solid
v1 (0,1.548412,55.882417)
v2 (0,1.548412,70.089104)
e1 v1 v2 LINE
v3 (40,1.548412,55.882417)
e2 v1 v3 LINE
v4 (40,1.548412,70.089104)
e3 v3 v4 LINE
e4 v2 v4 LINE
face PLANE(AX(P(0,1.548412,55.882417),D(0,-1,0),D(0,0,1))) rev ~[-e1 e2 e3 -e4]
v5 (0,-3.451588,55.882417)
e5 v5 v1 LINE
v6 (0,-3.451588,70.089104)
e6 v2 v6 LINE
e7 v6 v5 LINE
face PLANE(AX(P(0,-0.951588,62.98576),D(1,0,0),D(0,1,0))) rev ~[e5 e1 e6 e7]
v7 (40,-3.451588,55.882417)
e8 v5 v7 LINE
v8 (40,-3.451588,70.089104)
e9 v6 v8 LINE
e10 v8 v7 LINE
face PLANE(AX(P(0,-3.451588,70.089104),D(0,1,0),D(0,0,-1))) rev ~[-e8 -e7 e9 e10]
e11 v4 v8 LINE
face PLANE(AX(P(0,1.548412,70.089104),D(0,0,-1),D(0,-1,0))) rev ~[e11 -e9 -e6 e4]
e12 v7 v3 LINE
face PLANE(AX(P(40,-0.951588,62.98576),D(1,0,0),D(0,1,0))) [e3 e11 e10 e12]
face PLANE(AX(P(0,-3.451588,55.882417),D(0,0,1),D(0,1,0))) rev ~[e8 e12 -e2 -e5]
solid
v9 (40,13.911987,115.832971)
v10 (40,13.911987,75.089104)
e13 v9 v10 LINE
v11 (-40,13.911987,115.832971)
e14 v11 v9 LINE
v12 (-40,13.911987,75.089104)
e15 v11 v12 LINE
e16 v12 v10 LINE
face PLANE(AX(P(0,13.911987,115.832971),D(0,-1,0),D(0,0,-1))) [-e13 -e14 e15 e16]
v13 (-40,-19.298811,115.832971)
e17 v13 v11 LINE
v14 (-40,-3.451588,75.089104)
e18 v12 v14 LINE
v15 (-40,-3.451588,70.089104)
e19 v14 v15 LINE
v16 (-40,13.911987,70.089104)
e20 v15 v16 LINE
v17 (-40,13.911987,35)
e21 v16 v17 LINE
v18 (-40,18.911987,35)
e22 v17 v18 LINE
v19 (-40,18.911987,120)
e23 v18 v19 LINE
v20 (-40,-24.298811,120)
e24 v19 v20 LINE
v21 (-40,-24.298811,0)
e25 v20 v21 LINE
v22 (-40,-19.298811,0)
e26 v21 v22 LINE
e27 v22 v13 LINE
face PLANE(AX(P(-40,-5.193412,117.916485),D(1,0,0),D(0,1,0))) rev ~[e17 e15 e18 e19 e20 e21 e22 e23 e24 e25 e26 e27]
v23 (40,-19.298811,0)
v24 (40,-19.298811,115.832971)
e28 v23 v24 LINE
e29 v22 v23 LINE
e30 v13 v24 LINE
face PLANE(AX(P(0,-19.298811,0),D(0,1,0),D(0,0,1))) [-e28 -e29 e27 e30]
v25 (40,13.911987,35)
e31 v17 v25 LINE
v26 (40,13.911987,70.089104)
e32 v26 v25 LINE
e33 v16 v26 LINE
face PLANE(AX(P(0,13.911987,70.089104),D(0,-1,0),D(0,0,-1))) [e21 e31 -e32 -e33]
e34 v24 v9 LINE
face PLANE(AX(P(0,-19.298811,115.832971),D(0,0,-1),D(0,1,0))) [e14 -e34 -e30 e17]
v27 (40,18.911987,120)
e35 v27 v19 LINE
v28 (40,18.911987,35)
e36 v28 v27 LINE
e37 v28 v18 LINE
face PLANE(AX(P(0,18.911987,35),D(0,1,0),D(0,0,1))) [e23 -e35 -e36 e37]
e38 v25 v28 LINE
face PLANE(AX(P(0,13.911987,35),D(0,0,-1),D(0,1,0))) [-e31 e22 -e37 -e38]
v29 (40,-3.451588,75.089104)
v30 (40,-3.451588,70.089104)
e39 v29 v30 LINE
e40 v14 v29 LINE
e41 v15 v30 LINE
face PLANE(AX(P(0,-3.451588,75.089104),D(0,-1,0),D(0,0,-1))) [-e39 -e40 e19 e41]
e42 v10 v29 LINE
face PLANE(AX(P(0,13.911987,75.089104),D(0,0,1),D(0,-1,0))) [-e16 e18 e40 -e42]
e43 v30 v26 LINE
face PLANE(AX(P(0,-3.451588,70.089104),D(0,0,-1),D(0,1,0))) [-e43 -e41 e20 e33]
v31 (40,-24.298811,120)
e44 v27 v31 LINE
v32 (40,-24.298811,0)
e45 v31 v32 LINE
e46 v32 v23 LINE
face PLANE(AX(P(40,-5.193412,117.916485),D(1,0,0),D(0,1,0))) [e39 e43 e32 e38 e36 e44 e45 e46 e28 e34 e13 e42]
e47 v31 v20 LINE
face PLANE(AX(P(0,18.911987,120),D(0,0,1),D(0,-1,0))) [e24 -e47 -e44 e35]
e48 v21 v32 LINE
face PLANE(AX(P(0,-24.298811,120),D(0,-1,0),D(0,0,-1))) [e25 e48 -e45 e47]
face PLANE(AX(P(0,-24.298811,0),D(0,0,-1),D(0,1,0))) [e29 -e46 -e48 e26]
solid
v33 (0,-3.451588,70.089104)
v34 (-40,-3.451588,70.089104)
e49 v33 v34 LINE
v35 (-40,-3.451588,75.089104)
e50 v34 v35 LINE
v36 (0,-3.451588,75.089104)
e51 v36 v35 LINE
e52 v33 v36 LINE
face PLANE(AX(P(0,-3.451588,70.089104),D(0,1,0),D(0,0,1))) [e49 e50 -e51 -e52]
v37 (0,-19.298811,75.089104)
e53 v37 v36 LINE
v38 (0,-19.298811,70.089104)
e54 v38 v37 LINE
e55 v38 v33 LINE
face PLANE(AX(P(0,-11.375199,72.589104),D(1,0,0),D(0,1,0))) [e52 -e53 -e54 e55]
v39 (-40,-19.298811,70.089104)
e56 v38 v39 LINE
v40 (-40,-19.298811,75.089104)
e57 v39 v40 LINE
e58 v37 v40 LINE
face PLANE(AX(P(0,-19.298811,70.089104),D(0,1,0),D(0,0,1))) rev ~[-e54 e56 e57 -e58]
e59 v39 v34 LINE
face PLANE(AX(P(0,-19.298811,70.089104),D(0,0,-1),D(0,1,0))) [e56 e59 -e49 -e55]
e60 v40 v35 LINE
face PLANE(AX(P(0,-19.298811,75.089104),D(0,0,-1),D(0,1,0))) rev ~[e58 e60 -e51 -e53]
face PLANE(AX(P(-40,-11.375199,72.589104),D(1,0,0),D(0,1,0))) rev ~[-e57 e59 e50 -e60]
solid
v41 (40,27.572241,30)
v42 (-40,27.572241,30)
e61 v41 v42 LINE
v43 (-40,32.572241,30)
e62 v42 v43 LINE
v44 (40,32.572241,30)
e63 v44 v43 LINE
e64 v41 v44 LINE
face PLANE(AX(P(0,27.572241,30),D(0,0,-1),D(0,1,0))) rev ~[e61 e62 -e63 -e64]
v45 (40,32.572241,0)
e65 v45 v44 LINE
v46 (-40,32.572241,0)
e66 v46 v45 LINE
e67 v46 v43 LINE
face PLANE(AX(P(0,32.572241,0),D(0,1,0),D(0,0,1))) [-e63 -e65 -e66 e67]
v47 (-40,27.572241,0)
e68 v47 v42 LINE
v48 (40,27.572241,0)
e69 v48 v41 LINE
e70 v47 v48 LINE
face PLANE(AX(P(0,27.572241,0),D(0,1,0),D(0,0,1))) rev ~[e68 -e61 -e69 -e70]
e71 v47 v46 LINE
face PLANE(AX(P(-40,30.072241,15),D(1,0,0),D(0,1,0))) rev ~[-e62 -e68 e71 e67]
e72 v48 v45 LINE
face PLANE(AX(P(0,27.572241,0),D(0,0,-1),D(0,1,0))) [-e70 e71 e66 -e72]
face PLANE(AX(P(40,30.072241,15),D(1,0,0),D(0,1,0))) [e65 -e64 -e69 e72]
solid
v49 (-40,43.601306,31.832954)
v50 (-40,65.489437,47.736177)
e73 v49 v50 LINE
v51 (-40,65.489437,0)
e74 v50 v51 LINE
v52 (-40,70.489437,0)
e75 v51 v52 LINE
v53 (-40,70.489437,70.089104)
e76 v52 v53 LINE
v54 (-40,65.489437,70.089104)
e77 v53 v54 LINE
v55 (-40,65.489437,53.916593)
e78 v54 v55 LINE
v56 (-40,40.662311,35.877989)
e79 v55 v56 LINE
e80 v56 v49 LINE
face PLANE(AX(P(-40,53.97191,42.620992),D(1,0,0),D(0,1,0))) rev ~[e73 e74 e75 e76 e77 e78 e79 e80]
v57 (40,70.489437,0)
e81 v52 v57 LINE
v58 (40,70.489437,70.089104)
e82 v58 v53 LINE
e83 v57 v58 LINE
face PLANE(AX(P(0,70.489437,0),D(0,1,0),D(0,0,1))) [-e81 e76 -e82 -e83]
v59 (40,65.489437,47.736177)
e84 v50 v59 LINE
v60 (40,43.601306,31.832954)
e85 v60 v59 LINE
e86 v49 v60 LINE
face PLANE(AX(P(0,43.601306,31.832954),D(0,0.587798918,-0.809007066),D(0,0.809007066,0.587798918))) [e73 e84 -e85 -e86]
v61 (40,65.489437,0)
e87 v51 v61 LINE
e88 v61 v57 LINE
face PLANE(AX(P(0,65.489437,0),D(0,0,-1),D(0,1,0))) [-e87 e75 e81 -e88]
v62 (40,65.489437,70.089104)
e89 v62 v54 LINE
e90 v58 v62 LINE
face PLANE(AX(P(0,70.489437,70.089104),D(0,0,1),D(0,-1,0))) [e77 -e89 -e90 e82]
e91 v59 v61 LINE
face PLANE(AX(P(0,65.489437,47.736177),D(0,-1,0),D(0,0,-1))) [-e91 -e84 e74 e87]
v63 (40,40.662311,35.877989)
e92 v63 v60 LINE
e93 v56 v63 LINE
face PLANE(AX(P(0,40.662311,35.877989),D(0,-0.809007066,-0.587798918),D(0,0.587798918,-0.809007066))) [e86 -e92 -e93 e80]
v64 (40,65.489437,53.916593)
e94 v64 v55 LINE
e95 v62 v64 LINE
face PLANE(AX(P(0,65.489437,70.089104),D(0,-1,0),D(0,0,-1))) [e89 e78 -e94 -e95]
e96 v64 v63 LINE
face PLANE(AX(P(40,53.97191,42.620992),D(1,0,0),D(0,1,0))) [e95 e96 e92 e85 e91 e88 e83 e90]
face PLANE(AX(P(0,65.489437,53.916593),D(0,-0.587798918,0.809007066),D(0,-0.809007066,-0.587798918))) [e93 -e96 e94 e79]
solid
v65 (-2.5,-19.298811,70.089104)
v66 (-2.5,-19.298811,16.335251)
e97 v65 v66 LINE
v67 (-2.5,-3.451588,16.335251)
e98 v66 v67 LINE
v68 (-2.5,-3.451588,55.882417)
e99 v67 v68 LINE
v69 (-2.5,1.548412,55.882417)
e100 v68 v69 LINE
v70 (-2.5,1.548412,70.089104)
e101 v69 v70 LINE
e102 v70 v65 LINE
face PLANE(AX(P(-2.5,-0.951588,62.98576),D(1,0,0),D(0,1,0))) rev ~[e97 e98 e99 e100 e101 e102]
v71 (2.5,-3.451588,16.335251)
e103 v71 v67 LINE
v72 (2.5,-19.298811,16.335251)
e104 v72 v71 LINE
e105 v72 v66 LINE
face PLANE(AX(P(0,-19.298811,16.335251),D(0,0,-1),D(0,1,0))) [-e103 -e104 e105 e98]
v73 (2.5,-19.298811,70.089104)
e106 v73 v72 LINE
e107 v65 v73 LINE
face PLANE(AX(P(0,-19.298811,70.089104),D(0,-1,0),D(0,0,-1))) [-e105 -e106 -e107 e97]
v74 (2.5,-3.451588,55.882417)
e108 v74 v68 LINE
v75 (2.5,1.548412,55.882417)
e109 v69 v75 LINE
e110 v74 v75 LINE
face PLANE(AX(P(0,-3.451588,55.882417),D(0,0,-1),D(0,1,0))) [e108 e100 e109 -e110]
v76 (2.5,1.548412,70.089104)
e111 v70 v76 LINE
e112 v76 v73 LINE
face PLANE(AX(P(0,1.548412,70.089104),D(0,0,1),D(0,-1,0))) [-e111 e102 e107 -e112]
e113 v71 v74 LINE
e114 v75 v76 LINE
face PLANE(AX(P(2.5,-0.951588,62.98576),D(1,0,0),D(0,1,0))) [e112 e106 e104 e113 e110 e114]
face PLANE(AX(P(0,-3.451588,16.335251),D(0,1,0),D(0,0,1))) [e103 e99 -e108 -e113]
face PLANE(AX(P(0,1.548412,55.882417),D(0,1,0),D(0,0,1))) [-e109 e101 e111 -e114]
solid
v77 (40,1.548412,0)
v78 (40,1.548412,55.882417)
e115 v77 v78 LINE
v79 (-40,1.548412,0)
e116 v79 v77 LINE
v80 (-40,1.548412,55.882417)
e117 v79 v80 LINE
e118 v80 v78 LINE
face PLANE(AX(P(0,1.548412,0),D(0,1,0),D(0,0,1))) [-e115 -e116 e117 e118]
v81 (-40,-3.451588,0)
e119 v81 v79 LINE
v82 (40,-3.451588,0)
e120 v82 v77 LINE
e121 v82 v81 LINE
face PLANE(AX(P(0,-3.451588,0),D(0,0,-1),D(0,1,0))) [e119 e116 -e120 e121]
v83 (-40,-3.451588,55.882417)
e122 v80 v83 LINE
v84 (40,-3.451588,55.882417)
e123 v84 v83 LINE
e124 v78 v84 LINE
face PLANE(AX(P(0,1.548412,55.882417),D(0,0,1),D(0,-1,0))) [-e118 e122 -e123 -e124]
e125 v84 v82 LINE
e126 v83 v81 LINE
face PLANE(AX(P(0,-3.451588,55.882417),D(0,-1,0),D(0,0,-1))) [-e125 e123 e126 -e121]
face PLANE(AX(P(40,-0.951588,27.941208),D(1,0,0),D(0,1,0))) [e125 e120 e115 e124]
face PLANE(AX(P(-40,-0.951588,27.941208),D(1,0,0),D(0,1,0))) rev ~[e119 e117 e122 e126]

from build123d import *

# Parameters (mm, degrees)
F0_W     = 5
F0_H     = 35.0891035924
F1_DEPTH = 40
F0_H_2   = 30
F2_DEPTH = 2.5
F3_DEPTH = 40
F0_W_2   = 15.8472226467
F0_H_3   = 5
F4_DEPTH = 40


# Not quite as in the source:
# - a feature names something its author has since deleted; it is built from what else it names


with BuildPart() as f1:
    # F0 (on Right) → F1 (new body, symmetric)
    with BuildSketch(Plane.YZ):
        Polygon((13.9119866523, 115.8329709044), (13.9119866523, 120), (-24.2988105118, 120), (-24.2988105118, 115.8329709044), (-19.2988105118, 115.8329709044), align=None)
        Polygon((-24.2988105118, 0), (-19.2988105118, 0), (-19.2988105118, 16.3352508098), (-19.2988105118, 70.0891035924), (-19.2988105118, 75.0891035924), (-19.2988105118, 115.8329709044), (-24.2988105118, 115.8329709044), align=None)
        Polygon((13.9119866523, 70.0891035924), (18.9119866523, 70.0891035924), (18.9119866523, 120), (13.9119866523, 120), (13.9119866523, 115.8329709044), (13.9119866523, 75.0891035924), align=None)
        with Locations((16.4119866523, 52.5445517962)):
            Rectangle(F0_W, F0_H)
        Polygon((0, 70.0891035924), (1.5484121349, 70.0891035924), (13.9119866523, 70.0891035924), (13.9119866523, 75.0891035924), (-3.4515878651, 75.0891035924), (-3.4515878651, 70.0891035924), align=None)
    extrude(amount=F1_DEPTH, both=True)


with BuildPart() as f1b:
    # F0 (on Right) → F1, piece 2 (new body, symmetric)
    with BuildSketch(Plane.YZ):
        with Locations((30.0722406902, 15)):
            Rectangle(F0_W, F0_H_2)
    extrude(amount=F1_DEPTH, both=True)


with BuildPart() as f1c:
    # F0 (on Right) → F1, piece 3 (new body, symmetric)
    with BuildSketch(Plane.YZ):
        Polygon((65.4894374425, 53.9165928793), (40.6623113469, 35.8779891774), (43.6013059356, 31.8329538491), (65.4894374425, 47.7361771423), align=None)
        Polygon((65.4894374425, 47.7361771423), (65.4894374425, 0), (70.4894374425, 0), (70.4894374425, 53.9366312392), (70.4894374425, 70.0891035924), (65.4894374425, 70.0891035924), (65.4894374425, 53.9165928793), align=None)
    extrude(amount=F1_DEPTH, both=True)


with BuildPart() as f1d:
    # F0 (on Right) → F1, piece 4 (new body, symmetric)
    with BuildSketch(Plane.YZ):
        Polygon((-3.4515878651, 0), (1.5484121349, 0), (1.5484121349, 55.8824166656), (-3.4515878651, 55.8824166656), (-3.4515878651, 16.3352508098), align=None)
    extrude(amount=F1_DEPTH, both=True)


with BuildPart() as f2:
    # F0 (on Right) → F2 (new body, symmetric)
    with BuildSketch(Plane.YZ):
        Polygon((-3.4515878651, 55.8824166656), (1.5484121349, 55.8824166656), (1.5484121349, 70.0891035924), (0, 70.0891035924), (-3.4515878651, 70.0891035924), align=None)
        Polygon((-19.2988105118, 16.3352508098), (-3.4515878651, 16.3352508098), (-3.4515878651, 55.8824166656), (-3.4515878651, 70.0891035924), (-19.2988105118, 70.0891035924), align=None)
    extrude(amount=F2_DEPTH, both=True)


with BuildPart() as f3:
    # F0 (on Right) → F3 (new body, through all)
    with BuildSketch(Plane.YZ):
        Polygon((-3.4515878651, 55.8824166656), (1.5484121349, 55.8824166656), (1.5484121349, 70.0891035924), (0, 70.0891035924), (-3.4515878651, 70.0891035924), align=None)
    extrude(amount=F3_DEPTH)


with BuildPart() as f4:
    # F0 (on Right) → F4 (new body, through all)
    with BuildSketch(Plane.YZ):
        with Locations((-11.3751991885, 72.5891035924)):
            Rectangle(F0_W_2, F0_H_3)
    extrude(amount=-F4_DEPTH)


solid = Compound([f1.part, f1b.part, f1c.part, f1d.part, f2.part, f3.part, f4.part])
